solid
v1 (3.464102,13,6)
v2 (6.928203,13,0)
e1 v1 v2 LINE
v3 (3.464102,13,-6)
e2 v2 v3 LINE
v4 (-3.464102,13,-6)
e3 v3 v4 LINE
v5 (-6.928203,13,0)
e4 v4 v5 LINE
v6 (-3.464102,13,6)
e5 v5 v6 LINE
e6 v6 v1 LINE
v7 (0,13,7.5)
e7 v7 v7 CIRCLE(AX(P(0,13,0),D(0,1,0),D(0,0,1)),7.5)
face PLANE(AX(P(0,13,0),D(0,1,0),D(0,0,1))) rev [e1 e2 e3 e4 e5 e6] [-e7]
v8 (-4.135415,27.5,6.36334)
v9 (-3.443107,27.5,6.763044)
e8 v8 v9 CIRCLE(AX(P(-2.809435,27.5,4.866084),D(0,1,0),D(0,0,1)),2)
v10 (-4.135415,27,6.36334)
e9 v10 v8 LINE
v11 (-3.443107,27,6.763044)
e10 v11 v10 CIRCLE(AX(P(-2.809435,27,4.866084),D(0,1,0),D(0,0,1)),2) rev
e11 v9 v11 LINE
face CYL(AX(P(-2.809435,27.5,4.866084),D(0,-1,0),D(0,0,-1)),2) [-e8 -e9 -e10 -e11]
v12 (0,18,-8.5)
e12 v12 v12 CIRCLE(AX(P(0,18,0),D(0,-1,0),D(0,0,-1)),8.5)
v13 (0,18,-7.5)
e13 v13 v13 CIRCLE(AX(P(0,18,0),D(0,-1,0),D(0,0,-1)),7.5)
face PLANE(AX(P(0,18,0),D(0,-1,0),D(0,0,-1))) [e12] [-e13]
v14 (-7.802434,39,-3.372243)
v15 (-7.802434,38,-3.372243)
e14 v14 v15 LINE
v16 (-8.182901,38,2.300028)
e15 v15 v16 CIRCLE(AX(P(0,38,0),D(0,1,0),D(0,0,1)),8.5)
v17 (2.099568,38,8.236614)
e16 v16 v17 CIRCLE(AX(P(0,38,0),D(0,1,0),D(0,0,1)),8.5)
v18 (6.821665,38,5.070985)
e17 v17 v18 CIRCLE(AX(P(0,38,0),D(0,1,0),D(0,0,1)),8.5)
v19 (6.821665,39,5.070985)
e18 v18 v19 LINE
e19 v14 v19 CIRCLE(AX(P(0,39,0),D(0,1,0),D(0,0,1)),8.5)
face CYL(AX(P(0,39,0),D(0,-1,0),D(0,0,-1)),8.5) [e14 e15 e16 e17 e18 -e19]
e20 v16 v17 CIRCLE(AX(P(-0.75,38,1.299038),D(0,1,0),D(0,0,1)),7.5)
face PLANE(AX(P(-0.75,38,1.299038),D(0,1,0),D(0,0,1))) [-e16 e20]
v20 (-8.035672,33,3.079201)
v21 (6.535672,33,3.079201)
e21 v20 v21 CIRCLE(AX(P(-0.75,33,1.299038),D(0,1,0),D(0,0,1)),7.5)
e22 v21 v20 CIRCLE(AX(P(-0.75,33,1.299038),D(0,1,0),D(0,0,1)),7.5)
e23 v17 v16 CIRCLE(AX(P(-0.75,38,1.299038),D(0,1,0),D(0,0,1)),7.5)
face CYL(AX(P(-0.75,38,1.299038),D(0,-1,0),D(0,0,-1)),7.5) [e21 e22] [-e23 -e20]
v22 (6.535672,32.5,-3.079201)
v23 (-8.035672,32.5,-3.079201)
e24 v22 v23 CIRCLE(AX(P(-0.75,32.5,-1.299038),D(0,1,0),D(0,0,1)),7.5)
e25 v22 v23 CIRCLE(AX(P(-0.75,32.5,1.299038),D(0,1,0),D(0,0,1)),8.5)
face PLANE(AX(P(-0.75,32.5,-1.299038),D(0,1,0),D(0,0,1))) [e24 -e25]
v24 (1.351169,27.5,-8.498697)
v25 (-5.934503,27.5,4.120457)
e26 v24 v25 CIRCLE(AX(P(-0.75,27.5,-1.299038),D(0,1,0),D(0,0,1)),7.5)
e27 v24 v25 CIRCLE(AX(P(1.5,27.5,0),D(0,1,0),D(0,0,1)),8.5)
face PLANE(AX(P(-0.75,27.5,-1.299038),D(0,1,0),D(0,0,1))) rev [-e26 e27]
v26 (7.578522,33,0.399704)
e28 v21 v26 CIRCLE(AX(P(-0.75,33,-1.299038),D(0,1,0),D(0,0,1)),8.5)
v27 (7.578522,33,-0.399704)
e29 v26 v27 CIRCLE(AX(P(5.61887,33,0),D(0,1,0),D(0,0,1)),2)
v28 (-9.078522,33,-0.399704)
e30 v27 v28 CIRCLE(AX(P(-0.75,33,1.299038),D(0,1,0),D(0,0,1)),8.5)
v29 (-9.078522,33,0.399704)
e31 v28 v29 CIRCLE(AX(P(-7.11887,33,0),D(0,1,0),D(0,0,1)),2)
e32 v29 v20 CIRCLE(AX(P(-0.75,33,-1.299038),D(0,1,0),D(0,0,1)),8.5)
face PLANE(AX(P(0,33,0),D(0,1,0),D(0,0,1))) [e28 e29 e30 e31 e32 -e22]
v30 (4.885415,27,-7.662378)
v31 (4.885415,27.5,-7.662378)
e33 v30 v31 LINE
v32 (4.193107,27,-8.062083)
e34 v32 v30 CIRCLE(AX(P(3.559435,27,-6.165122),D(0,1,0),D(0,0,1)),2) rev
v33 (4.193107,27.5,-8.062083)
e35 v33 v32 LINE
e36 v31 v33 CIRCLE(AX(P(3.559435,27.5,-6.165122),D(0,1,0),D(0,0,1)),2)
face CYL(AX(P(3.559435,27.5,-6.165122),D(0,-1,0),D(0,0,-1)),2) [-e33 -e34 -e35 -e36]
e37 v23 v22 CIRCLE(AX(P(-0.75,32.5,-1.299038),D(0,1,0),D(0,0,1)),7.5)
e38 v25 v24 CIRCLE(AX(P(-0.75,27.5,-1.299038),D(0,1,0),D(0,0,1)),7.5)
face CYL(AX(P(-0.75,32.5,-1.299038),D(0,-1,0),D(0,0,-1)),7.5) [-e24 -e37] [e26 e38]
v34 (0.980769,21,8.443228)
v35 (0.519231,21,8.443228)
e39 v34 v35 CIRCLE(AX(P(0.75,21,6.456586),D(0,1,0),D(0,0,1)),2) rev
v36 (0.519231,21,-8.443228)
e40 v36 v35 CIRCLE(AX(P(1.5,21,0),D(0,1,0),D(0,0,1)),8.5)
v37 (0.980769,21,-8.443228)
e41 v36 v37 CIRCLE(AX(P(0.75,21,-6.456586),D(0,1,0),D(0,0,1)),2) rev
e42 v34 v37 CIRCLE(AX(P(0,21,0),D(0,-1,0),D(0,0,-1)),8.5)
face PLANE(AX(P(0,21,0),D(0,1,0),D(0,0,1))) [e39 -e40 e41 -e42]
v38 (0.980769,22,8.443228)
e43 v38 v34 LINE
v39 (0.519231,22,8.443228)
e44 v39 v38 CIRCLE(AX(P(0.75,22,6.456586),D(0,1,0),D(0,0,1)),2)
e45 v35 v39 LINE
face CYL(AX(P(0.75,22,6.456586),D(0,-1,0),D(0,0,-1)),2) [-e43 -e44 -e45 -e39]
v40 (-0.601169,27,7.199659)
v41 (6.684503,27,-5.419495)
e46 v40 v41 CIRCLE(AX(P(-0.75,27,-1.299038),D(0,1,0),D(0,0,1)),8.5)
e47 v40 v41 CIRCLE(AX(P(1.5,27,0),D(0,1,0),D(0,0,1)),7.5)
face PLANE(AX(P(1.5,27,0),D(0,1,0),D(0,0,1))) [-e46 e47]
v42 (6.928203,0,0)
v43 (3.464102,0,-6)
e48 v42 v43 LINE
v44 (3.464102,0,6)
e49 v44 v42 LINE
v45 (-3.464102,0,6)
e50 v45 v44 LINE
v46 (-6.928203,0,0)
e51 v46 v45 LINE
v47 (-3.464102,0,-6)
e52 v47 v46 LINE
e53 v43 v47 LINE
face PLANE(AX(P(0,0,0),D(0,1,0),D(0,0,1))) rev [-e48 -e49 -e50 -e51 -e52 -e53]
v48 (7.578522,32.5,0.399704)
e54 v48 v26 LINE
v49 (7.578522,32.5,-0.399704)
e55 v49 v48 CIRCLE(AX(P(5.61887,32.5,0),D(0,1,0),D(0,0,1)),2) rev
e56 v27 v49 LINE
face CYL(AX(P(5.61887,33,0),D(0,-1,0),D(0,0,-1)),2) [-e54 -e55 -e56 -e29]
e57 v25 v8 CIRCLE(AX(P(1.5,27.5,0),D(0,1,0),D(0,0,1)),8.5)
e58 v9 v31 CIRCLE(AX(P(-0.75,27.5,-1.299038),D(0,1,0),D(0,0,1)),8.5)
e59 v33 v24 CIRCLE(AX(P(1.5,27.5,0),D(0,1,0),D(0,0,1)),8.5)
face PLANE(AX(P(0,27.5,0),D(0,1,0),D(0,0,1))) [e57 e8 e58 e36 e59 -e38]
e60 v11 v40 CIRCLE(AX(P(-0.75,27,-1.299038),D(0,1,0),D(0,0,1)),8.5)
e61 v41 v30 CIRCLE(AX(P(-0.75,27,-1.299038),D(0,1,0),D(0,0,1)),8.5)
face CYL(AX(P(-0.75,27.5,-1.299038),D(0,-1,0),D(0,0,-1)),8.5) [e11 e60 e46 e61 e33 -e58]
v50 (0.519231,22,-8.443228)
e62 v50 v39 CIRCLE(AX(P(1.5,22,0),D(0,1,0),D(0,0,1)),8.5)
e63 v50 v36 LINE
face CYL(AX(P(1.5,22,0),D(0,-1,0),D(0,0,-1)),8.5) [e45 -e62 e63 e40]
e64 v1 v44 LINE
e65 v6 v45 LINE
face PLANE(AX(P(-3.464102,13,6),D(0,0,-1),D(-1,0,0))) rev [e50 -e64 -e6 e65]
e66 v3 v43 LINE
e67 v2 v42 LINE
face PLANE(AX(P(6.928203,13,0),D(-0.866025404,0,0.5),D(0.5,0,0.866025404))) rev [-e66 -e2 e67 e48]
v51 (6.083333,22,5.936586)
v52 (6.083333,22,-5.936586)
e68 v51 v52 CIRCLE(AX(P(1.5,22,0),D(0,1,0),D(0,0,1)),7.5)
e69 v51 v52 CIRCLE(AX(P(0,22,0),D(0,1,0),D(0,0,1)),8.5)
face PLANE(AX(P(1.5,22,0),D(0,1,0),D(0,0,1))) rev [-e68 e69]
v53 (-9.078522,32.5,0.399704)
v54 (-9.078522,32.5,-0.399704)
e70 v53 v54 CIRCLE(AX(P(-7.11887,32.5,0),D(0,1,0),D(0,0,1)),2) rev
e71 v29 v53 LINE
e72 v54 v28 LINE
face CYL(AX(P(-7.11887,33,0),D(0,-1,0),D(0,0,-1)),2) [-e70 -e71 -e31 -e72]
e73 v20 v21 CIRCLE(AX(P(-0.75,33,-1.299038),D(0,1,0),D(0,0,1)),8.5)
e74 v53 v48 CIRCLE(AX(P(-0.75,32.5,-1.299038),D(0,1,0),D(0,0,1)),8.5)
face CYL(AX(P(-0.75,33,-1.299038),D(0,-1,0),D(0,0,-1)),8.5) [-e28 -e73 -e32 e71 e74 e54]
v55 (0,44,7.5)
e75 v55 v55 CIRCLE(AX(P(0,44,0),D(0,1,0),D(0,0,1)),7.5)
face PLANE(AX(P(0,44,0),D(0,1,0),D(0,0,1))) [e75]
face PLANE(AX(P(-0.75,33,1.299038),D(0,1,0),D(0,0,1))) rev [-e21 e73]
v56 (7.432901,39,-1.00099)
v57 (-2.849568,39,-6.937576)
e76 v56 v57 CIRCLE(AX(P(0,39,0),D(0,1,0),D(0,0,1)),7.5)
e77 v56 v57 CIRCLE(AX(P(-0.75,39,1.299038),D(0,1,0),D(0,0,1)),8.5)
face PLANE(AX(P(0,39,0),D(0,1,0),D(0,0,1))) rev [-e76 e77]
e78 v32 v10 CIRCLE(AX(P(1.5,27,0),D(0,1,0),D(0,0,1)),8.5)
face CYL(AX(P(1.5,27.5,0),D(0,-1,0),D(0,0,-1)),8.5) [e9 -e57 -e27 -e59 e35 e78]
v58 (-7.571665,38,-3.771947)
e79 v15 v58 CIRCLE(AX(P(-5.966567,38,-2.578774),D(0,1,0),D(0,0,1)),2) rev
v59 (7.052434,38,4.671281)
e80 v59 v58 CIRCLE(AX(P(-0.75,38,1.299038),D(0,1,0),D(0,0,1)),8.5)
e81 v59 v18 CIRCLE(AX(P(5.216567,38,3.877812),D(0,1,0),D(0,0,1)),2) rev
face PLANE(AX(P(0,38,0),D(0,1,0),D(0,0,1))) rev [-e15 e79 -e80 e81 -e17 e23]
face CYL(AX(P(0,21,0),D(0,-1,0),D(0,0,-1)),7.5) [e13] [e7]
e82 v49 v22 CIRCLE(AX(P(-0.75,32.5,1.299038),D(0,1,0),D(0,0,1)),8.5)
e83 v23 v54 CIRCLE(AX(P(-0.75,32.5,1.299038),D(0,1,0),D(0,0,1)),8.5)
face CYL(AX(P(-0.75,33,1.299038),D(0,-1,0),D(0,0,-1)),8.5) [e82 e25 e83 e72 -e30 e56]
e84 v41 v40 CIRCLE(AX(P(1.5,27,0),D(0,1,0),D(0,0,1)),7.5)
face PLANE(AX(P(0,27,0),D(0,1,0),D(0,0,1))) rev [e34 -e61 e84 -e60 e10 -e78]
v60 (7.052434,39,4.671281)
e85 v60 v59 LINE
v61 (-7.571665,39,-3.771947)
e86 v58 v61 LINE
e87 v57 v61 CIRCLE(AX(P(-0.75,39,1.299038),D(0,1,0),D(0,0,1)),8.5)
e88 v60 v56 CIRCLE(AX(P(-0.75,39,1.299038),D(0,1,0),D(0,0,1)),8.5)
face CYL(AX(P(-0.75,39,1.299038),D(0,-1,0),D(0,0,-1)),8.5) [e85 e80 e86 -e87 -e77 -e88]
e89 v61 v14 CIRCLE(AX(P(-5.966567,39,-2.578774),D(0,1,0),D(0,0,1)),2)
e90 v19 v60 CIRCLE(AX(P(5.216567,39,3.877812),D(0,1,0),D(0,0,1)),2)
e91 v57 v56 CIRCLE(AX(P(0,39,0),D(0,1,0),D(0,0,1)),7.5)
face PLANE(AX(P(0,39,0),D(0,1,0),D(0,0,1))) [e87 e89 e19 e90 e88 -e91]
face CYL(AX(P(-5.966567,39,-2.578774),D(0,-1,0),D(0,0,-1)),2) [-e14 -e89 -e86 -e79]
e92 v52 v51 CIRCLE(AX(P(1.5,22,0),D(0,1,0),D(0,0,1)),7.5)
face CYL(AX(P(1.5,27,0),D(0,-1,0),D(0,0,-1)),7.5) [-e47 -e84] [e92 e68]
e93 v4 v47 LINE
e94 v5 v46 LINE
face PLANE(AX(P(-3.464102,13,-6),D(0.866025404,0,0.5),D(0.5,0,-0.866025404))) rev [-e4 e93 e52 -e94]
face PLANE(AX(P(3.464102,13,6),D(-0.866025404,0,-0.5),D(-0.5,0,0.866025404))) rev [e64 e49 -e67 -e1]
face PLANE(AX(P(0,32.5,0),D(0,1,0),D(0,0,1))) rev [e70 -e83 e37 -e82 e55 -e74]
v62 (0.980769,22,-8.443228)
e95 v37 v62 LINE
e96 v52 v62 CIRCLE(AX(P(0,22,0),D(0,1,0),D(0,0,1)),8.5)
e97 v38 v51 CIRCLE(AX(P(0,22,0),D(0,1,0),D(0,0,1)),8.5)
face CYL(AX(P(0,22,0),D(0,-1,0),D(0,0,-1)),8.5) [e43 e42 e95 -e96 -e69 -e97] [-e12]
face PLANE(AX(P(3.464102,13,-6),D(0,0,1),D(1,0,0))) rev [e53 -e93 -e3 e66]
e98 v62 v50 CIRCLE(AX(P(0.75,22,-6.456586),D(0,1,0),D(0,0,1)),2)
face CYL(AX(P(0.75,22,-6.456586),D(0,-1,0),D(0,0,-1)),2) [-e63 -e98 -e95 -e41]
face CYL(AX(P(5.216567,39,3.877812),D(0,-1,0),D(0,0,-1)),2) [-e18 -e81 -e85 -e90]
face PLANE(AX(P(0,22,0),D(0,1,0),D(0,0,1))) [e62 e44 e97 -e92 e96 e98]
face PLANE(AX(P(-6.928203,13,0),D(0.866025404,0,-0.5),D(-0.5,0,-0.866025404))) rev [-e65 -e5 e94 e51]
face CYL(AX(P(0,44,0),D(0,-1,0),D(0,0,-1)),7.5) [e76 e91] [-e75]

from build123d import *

# Parameters (mm, degrees)
BOSS_EXTRUDE1_DEPTH  = 13
SKETCH5_R            = 7.5
BOSS_EXTRUDE2_DEPTH  = 8
BOSS_EXTRUDE3_DEPTH  = 1
SKETCH7_R            = 7.5
BOSS_EXTRUDE4_DEPTH  = 5
BOSS_EXTRUDE5_DEPTH  = 0.5
SKETCH9_R            = 7.5
BOSS_EXTRUDE6_DEPTH  = 5
BOSS_EXTRUDE7_DEPTH  = 0.5
SKETCH12_R           = 7.5
BOSS_EXTRUDE8_DEPTH  = 5
BOSS_EXTRUDE9_DEPTH  = 1
SKETCH14_R           = 7.5
BOSS_EXTRUDE10_DEPTH = 5
FILLET1_R            = 2
BOSS_EXTRUDE11_START = 3
SKETCH15_R           = 8.5
BOSS_EXTRUDE11_DEPTH = 3


with BuildPart() as part:
    # Sketch4 → Boss-Extrude1 (new body)
    with BuildSketch(Plane(origin=(0, 0, 0), x_dir=(1, 0, 0), z_dir=(0, 1, 0))):
        Polygon((-3.464101615, 6), (-6.92820323, 0), (-3.464101615, -6), (3.464101615, -6), (6.92820323, 0), (3.464101615, 6), align=None)
    extrude(amount=BOSS_EXTRUDE1_DEPTH)

    # Sketch5 → Boss-Extrude2 (add)
    with BuildSketch(Plane(origin=(0, 13, 0), x_dir=(1, 0, 0), z_dir=(0, 1, 0))):
        Circle(SKETCH5_R)
    extrude(amount=BOSS_EXTRUDE2_DEPTH)

    # Sketch6 → Boss-Extrude3 (add)
    with BuildSketch(Plane(origin=(0, 21, 0), x_dir=(1, 0, 0), z_dir=(0, 1, 0))):
        with BuildLine():
            ThreePointArc((0.75, -8.466847111), (8.5, 0), (0.75, 8.466847111))
            ThreePointArc((0.75, 8.466847111), (-7, 0), (0.75, -8.466847111))
        make_face()
    extrude(amount=BOSS_EXTRUDE3_DEPTH)

    # Sketch7 → Boss-Extrude4 (add)
    with BuildSketch(Plane(origin=(0, 22, 0), x_dir=(1, 0, 0), z_dir=(0, 1, 0))):
        with Locations((1.5, 0)):
            Circle(SKETCH7_R)
    extrude(amount=BOSS_EXTRUDE4_DEPTH)

    # Sketch8 → Boss-Extrude5 (add)
    with BuildSketch(Plane(origin=(0, 27, 0), x_dir=(1, 0, 0), z_dir=(0, 1, 0))):
        with BuildLine():
            ThreePointArc((4.575074404, 7.924261316), (-5.861215932, 4.25), (-3.825074404, -6.625223211))
            ThreePointArc((-3.825074404, -6.625223211), (6.611215932, -2.950961894), (4.575074404, 7.924261316))
        make_face()
    extrude(amount=BOSS_EXTRUDE5_DEPTH)

    # Sketch9 → Boss-Extrude6 (add)
    with BuildSketch(Plane(origin=(0, 27.5, 0), x_dir=(1, 0, 0), z_dir=(0, 1, 0))):
        with Locations((-0.75, 1.299038106)):
            Circle(SKETCH9_R)
    extrude(amount=BOSS_EXTRUDE6_DEPTH)

    # Sketch11 → Boss-Extrude7 (add)
    with BuildSketch(Plane(origin=(0, 32.5, 0), x_dir=(1, 0, 0), z_dir=(0, 1, 0))):
        with BuildLine():
            ThreePointArc((-9.150148808, 0), (-0.75, -7.200961894), (7.650148808, 0))
            ThreePointArc((7.650148808, 0), (-0.75, 7.200961894), (-9.150148808, 0))
        make_face()
    extrude(amount=BOSS_EXTRUDE7_DEPTH)

    # Sketch12 → Boss-Extrude8 (add)
    with BuildSketch(Plane(origin=(0, 33, 0), x_dir=(1, 0, 0), z_dir=(0, 1, 0))):
        with Locations((-0.75, -1.299038106)):
            Circle(SKETCH12_R)
    extrude(amount=BOSS_EXTRUDE8_DEPTH)

    # Sketch13 → Boss-Extrude9 (add)
    with BuildSketch(Plane(origin=(0, 38, 0), x_dir=(1, 0, 0), z_dir=(0, 1, 0))):
        with BuildLine():
            ThreePointArc((6.957504688, -4.882942608), (3.5, 6.062177826), (-7.707504688, 3.583904503))
            ThreePointArc((-7.707504688, 3.583904503), (-4.25, -7.361215932), (6.957504688, -4.882942608))
        make_face()
    extrude(amount=BOSS_EXTRUDE9_DEPTH)

    # Sketch14 → Boss-Extrude10 (add)
    with BuildSketch(Plane(origin=(0, 39, 0), x_dir=(1, 0, 0), z_dir=(0, 1, 0))):
        Circle(SKETCH14_R)
    extrude(amount=BOSS_EXTRUDE10_DEPTH)

    # Fillet1
    fillet1_edges = [part.edges().sort_by_distance(p)[0] for p in [
        (0.75, 21.5, -8.466847111),
        (0.75, 21.5, 8.466847111),
        (-3.825074404, 27.25, 6.625223211),
        (4.575074404, 27.25, -7.924261316),
        (7.650148808, 32.75, 0),
        (-9.150148808, 32.75, 0),
        (-7.707504688, 38.5, -3.583904503),
        (6.957504688, 38.5, 4.882942608),
    ]]
    fillet(fillet1_edges, radius=FILLET1_R)

    # Sketch15 → Boss-Extrude11 (add)
    with BuildSketch(Plane.XZ.offset(-21).offset(BOSS_EXTRUDE11_START)):
        Circle(SKETCH15_R)
    extrude(amount=-BOSS_EXTRUDE11_DEPTH)


solid = part.part
